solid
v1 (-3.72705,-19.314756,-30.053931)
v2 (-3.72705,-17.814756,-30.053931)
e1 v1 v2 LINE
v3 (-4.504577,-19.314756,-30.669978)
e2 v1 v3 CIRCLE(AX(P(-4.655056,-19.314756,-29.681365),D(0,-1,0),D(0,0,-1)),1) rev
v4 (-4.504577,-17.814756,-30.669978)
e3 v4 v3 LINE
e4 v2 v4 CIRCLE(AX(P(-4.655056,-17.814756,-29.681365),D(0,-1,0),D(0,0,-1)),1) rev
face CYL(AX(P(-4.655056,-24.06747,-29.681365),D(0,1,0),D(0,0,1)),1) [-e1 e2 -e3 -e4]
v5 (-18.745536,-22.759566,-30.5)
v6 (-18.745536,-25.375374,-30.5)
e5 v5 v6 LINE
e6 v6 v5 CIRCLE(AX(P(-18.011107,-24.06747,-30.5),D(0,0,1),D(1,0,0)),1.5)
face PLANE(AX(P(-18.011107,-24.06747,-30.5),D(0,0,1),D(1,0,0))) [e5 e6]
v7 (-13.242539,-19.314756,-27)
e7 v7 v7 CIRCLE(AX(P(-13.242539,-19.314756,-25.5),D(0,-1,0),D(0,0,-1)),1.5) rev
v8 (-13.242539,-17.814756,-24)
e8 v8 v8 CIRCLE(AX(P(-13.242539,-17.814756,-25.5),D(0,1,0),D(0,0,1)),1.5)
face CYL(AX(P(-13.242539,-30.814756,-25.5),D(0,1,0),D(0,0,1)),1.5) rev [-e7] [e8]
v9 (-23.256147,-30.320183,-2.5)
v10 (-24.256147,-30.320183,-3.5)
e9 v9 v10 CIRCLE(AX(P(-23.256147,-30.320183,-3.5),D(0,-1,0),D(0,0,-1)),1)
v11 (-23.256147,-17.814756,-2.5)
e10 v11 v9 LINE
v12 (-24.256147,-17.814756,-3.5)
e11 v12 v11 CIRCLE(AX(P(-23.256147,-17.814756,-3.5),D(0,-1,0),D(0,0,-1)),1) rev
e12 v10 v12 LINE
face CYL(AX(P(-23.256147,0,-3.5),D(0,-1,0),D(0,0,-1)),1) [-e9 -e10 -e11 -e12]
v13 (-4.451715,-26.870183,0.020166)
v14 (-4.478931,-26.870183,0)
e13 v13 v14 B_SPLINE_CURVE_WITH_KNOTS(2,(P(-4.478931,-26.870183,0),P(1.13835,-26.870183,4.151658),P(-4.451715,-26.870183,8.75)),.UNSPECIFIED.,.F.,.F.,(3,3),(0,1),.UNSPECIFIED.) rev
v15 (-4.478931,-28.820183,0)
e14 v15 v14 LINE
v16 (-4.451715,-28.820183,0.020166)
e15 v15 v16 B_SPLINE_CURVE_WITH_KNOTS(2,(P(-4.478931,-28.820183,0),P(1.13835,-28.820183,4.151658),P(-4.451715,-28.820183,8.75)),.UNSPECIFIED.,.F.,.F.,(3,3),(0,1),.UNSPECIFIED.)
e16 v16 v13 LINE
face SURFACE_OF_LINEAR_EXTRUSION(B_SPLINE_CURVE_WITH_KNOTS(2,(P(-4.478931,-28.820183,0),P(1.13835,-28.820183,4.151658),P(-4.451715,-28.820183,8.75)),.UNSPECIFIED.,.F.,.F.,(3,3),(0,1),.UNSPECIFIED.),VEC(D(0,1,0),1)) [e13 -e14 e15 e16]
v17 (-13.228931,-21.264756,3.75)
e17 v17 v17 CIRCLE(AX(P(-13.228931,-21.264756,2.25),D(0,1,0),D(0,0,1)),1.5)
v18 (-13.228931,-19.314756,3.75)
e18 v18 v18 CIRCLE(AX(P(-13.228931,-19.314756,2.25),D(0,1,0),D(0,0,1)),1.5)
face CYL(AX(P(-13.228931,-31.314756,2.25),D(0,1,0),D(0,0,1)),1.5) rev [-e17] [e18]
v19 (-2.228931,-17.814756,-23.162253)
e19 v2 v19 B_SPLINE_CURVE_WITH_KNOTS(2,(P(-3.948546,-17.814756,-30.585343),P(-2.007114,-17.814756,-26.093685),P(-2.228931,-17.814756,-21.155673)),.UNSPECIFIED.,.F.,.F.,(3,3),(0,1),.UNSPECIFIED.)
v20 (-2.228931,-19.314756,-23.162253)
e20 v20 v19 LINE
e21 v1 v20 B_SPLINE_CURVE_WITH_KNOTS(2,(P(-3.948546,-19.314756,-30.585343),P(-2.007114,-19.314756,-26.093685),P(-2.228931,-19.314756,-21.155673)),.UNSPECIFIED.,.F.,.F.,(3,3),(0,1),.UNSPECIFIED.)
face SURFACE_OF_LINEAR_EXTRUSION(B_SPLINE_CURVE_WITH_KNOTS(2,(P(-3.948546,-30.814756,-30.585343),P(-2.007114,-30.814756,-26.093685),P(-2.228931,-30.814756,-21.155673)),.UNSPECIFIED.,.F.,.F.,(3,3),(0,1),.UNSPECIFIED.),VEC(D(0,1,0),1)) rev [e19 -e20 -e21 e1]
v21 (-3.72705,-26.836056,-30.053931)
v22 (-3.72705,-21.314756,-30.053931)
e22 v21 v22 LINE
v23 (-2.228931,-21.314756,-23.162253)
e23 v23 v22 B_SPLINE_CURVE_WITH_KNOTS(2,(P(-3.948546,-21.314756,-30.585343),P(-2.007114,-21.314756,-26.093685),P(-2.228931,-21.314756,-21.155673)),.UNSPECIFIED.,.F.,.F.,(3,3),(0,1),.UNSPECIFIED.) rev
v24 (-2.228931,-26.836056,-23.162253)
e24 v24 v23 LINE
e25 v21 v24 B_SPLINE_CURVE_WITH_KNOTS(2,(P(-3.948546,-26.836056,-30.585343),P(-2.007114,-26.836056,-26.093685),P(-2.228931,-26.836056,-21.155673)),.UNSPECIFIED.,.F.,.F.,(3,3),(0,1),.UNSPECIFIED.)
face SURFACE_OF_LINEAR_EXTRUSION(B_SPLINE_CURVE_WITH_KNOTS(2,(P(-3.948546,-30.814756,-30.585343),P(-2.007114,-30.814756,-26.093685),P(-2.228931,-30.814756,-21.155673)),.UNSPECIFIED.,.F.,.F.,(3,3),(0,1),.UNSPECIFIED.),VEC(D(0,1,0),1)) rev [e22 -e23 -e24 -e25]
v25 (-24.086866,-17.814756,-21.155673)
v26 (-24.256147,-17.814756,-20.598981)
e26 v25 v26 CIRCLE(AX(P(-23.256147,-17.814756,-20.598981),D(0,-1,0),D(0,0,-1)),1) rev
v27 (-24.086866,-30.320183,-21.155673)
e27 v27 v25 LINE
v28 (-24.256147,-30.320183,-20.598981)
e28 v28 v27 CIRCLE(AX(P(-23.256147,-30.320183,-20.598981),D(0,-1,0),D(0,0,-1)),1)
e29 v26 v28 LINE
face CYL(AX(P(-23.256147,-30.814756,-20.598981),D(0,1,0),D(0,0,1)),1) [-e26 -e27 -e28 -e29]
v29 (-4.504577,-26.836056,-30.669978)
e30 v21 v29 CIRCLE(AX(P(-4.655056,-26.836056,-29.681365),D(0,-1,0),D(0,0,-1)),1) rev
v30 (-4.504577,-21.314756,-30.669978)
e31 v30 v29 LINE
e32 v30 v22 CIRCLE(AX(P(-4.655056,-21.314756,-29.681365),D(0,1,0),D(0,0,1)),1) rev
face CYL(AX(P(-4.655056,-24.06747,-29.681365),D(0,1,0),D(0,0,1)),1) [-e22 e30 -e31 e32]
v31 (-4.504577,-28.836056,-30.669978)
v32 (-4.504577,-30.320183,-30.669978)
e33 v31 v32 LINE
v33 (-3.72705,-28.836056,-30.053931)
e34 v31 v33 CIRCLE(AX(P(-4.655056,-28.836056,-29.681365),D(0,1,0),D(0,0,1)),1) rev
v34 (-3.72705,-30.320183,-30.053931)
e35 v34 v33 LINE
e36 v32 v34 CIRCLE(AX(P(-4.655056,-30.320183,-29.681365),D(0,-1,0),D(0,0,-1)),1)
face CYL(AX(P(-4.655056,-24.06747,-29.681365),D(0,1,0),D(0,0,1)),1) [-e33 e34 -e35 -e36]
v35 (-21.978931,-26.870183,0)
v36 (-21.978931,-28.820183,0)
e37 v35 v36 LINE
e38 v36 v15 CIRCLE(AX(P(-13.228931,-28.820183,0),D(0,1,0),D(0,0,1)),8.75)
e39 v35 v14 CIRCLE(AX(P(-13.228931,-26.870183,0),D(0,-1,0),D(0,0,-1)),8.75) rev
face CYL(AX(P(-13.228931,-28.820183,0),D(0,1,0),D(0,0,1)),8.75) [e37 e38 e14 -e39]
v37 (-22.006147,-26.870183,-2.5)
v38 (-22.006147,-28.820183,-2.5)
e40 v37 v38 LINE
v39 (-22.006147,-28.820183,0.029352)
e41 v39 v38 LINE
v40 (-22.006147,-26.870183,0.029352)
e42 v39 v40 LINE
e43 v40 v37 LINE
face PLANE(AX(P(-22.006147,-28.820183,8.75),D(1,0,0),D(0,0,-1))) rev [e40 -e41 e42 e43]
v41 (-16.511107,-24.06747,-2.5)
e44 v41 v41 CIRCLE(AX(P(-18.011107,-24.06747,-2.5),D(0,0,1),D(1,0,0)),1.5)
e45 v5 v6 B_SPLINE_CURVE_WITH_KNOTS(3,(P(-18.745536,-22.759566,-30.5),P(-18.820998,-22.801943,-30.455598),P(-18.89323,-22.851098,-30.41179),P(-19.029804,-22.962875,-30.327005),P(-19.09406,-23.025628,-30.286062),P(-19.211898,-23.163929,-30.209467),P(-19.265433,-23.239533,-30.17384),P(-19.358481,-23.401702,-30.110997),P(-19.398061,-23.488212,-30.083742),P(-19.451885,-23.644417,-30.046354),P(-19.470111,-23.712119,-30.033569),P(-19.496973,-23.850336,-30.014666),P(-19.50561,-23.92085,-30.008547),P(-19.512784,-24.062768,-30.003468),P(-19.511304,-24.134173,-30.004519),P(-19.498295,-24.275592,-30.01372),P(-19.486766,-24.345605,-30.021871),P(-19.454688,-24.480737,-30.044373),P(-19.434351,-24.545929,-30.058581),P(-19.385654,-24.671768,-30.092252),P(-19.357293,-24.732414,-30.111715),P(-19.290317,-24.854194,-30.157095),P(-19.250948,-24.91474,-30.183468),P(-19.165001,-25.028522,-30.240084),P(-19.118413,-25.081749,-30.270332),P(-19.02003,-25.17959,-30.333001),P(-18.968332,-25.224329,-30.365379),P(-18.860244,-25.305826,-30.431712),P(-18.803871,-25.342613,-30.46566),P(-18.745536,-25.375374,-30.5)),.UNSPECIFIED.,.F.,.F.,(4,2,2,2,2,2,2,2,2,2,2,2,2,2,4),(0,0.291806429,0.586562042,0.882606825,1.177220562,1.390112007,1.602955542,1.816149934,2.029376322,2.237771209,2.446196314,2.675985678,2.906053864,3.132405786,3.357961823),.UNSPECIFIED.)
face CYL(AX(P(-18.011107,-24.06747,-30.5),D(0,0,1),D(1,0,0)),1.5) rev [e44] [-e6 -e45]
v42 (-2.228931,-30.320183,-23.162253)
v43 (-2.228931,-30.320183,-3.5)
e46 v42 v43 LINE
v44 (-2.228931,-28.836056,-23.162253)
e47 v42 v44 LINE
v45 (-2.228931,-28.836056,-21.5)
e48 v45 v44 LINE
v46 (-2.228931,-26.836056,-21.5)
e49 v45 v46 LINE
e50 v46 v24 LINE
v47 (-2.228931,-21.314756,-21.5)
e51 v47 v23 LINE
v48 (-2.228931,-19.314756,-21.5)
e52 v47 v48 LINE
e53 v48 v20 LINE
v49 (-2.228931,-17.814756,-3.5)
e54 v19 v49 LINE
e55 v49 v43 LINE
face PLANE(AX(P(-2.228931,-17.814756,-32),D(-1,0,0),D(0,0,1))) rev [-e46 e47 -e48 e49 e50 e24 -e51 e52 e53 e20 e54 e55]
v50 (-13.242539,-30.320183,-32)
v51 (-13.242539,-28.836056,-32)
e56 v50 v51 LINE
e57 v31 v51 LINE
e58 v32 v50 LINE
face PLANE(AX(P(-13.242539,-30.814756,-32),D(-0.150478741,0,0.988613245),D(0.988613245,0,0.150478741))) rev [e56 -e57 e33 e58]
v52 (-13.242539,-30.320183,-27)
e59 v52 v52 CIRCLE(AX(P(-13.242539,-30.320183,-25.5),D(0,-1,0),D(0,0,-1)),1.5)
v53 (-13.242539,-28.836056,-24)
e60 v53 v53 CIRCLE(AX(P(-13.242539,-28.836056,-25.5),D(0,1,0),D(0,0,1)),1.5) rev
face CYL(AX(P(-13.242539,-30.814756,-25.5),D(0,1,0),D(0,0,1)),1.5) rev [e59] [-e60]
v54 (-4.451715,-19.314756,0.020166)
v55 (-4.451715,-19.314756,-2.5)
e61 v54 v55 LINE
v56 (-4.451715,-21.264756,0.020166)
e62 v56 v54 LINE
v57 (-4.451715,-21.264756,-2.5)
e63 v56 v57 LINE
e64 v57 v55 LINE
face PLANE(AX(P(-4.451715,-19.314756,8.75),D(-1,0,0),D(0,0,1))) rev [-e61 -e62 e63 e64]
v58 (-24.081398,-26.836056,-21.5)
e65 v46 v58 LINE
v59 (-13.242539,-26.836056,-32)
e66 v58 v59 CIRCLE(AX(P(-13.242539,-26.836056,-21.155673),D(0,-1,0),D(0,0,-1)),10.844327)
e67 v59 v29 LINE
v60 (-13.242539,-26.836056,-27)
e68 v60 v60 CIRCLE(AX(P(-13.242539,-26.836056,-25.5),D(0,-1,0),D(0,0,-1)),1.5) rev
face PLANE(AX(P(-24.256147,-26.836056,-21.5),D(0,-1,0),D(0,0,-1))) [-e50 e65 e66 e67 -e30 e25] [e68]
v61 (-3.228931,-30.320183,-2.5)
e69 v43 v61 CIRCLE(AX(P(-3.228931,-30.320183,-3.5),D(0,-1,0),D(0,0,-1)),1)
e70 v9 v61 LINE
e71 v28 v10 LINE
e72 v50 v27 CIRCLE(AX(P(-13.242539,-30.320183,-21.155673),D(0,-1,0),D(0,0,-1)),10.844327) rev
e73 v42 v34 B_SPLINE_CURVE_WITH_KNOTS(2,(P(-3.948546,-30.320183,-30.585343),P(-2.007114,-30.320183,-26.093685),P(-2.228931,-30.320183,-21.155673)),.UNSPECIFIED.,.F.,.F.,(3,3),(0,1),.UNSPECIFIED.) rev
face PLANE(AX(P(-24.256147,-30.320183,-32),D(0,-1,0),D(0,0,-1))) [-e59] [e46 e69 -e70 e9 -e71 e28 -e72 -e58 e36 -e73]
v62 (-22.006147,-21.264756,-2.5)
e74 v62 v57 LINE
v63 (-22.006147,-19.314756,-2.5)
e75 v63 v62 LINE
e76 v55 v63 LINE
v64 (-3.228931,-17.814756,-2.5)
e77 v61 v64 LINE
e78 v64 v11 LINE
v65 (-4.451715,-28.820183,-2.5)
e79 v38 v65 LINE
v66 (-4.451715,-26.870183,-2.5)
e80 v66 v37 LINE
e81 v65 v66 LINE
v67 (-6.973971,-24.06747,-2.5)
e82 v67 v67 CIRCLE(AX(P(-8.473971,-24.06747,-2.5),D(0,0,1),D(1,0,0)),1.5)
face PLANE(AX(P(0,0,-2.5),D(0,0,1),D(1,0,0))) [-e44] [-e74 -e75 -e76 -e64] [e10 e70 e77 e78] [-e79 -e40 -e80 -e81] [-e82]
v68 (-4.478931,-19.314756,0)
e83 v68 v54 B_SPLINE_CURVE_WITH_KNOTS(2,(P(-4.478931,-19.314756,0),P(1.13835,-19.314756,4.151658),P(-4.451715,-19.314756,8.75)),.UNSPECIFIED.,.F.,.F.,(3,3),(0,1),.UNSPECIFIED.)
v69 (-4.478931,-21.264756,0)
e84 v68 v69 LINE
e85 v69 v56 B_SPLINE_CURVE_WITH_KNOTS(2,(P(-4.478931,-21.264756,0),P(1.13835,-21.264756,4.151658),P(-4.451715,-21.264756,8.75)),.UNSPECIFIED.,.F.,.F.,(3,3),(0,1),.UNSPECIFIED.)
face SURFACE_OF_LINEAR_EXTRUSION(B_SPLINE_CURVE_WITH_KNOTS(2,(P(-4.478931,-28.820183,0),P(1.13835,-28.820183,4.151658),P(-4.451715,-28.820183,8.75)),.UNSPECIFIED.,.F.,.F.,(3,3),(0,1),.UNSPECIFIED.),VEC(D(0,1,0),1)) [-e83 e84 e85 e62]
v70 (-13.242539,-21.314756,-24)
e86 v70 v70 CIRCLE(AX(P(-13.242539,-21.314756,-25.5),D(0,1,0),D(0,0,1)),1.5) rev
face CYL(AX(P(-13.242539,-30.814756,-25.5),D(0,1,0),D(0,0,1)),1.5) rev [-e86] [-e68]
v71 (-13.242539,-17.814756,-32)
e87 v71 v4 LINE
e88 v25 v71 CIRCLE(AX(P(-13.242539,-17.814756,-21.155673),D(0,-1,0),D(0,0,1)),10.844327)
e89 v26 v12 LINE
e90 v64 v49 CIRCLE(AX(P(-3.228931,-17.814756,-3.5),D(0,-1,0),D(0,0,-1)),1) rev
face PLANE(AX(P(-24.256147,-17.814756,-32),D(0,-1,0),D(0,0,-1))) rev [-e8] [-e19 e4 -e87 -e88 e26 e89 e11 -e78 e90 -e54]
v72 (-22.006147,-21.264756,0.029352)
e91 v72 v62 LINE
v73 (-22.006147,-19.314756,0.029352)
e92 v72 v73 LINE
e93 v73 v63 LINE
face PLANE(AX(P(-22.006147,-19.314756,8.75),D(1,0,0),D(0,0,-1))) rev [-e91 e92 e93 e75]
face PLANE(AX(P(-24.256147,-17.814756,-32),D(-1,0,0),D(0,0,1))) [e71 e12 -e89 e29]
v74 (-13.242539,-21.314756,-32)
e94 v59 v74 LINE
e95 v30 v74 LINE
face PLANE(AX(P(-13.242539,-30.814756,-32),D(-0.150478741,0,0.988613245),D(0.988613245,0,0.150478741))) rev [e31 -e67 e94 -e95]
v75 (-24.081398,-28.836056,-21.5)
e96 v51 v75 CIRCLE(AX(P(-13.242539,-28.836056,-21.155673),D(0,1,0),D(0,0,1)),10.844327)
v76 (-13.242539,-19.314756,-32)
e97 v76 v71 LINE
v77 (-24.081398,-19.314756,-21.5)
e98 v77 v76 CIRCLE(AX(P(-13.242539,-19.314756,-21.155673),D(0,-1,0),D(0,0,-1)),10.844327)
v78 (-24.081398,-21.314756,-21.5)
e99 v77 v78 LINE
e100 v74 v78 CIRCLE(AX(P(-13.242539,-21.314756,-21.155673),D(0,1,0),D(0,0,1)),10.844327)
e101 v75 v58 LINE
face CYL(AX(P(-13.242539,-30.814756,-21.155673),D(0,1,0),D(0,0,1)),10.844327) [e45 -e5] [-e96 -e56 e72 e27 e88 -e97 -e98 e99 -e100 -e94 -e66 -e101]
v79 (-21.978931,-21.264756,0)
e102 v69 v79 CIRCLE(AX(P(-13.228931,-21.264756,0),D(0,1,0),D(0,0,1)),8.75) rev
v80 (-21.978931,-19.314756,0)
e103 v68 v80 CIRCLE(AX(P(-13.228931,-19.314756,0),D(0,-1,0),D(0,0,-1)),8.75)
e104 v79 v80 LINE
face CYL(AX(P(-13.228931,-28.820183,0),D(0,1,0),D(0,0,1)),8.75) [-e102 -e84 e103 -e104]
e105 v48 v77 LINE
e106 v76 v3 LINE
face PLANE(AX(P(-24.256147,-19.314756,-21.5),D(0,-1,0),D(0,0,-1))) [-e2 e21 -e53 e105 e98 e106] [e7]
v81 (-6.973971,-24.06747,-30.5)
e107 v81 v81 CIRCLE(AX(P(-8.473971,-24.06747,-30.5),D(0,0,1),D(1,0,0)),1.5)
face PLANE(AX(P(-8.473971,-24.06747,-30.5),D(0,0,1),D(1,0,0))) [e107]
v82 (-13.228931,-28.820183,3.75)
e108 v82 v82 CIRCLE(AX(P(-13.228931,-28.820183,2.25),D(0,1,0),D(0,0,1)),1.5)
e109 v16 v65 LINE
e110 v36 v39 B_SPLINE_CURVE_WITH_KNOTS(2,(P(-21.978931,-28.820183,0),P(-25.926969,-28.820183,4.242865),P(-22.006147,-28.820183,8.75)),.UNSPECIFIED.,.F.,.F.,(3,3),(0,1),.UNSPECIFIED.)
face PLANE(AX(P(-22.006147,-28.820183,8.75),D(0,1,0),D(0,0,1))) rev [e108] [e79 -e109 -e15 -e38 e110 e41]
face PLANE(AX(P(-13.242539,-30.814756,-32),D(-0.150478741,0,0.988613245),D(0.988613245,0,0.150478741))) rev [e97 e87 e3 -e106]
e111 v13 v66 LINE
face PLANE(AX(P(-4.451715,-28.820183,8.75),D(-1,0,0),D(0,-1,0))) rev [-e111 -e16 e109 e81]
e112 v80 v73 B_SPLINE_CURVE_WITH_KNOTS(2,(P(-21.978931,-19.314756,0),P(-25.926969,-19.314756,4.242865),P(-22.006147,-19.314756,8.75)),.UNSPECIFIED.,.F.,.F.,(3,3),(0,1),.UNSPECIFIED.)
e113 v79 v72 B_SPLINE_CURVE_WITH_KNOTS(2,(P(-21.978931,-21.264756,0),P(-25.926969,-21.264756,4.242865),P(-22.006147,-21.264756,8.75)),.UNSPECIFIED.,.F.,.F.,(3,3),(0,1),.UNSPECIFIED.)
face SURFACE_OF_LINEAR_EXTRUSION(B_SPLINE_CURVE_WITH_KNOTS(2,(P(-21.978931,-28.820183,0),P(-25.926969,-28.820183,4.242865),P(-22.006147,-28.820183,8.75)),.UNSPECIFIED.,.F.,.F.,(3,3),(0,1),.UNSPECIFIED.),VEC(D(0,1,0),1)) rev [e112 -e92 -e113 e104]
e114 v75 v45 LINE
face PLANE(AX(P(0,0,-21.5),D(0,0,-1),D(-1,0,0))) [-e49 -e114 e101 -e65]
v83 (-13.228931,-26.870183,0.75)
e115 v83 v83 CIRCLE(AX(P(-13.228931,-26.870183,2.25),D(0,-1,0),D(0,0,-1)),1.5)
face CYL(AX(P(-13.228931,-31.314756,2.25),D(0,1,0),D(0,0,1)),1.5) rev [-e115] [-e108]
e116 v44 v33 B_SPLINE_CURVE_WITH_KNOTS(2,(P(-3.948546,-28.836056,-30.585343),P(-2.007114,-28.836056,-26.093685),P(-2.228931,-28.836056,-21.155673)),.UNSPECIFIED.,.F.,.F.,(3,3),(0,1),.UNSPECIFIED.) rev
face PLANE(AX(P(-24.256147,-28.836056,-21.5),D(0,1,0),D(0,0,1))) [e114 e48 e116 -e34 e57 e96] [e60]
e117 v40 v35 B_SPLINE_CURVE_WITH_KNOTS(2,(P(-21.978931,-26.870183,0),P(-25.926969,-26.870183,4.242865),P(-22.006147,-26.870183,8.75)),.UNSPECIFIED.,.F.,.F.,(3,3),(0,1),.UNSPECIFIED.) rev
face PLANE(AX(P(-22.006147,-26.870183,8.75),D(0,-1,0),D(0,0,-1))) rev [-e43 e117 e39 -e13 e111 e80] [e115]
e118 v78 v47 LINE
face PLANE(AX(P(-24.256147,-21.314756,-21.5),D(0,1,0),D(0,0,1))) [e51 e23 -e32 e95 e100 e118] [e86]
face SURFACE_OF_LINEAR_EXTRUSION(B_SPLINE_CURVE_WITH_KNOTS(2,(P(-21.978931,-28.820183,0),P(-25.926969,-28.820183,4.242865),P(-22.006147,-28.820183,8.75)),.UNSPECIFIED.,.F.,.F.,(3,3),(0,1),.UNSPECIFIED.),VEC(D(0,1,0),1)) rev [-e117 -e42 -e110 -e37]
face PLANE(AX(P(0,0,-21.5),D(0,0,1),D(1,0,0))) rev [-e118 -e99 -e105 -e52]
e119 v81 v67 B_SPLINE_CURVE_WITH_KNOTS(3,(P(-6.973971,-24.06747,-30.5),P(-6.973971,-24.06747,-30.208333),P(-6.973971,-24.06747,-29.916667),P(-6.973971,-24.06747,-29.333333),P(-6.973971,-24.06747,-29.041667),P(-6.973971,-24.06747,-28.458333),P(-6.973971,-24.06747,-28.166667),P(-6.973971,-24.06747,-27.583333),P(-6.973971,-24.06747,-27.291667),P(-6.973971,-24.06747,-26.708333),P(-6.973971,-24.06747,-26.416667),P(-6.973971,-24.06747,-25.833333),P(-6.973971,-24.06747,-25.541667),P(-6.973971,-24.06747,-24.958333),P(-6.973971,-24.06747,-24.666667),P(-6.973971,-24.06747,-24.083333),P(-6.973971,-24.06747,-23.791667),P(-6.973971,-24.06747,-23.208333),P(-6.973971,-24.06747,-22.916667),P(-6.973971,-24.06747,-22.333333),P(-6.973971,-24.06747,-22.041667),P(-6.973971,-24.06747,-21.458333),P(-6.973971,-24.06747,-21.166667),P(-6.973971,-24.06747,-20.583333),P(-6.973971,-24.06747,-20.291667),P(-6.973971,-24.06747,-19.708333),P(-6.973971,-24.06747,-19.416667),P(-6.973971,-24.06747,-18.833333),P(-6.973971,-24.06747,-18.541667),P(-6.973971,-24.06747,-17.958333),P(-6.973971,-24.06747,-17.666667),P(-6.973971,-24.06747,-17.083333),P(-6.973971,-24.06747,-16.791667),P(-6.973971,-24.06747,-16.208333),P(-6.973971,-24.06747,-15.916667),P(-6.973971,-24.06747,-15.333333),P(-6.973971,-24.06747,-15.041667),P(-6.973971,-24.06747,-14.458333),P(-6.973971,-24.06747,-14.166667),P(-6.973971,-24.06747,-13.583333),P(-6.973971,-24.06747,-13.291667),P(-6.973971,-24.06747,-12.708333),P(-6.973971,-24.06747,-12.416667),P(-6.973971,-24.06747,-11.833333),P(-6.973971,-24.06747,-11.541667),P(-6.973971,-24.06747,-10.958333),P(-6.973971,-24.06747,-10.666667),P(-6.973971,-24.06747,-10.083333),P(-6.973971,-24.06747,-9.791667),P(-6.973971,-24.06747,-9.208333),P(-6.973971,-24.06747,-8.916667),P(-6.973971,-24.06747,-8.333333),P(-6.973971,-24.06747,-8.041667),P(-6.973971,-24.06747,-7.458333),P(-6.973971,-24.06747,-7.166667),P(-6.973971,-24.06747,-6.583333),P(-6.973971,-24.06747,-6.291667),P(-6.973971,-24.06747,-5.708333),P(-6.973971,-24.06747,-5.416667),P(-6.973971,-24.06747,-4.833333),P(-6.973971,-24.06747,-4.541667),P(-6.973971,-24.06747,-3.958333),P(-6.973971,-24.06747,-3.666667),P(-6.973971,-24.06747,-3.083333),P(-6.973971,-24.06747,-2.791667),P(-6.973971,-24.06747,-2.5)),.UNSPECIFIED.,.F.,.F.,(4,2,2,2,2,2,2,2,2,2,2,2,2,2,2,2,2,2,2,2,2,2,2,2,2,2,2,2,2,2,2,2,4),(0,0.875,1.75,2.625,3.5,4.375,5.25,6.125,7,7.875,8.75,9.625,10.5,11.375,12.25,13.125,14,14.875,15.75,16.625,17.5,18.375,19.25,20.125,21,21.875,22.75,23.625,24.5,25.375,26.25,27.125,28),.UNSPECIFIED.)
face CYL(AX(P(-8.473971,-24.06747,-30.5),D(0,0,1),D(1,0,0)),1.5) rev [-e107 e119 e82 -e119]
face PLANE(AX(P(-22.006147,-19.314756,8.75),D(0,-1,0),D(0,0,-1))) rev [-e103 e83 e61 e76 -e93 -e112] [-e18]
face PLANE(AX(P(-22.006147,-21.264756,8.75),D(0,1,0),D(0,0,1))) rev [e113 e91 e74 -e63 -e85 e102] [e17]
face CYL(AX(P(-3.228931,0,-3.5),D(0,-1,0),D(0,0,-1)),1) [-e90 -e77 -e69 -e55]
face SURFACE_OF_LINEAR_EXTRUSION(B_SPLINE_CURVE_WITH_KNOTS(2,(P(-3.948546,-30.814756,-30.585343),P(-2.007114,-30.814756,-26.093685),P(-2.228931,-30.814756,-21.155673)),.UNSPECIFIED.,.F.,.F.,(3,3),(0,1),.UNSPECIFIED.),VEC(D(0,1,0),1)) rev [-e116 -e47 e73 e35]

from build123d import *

# Parameters (mm, degrees)
SKETCH2_W             = 17.554431489
SKETCH2_H             = 1.95
BOSS_EXTRUDE1_DEPTH   = 8.75
BOSS_EXTRUDE1_2_DEPTH = 8.75
CUT_EXTRUDE1_DEPTH    = 26.518349076
SKETCH4_W             = 22.027215745
SKETCH4_H             = 12.505427167
BOSS_EXTRUDE2_DEPTH   = 32
SKETCH5_R             = 1.5
CUT_EXTRUDE2_DEPTH    = 12
SKETCH6_W             = 22.027215745
SKETCH6_H             = 12.505427167
SKETCH6_W_2           = 17.554431489
SKETCH6_H_2           = 1.95
CUT_EXTRUDE3_DEPTH    = 2.5
SKETCH7_R             = 1.5
CUT_EXTRUDE4_DEPTH    = 13
SKETCH8_R             = 1.5
CUT_EXTRUDE5_DEPTH    = 28
FILLET3_R             = 1
SKETCH9_W             = 22.02721574
SKETCH9_H             = 2
CUT_EXTRUDE6_DEPTH    = 11


with BuildPart() as part:
    # Sketch2 → Boss-Extrude1 (new body)
    with BuildSketch(Plane.XY):
        with Locations((-13.228930986, -27.845183414)):
            Rectangle(SKETCH2_W, SKETCH2_H)
    extrude(amount=BOSS_EXTRUDE1_DEPTH)


with BuildPart() as body_2:
    # Sketch2 → Boss-Extrude1 2 (new body)
    with BuildSketch(Plane.XY):
        with Locations((-13.228930986, -20.289756247)):
            Rectangle(SKETCH2_W, SKETCH2_H)
    extrude(amount=BOSS_EXTRUDE1_2_DEPTH)


with BuildPart() as cut_extrude1_tool:
    # Sketch3 → Cut-Extrude1 (new, through all)
    with BuildSketch(Plane(origin=(0, -19.314756247, 0), x_dir=(1, 0, 0), z_dir=(0, 1, 0))):
        with BuildLine():
            ThreePointArc((-13.228930986, -8.75), (-7.041746651, -6.187184335), (-4.478930986, 0))
            add(Edge.make_bspline(
                [(-4.478930986, 0), (1.138349918, -4.151657709), (-4.451715242, -8.75)],
                knots=[0, 0, 0, 1, 1, 1], degree=2))
            add(Edge.make_bspline(
                [(-22.006146731, -8.75), (-13.228930986, -12.473510392), (-4.451715242, -8.75)],
                knots=[0, 0, 0, 1, 1, 1], degree=2))
            add(Edge.make_bspline(
                [(-21.978930986, 0), (-25.926969228, -4.242865138), (-22.006146731, -8.75)],
                knots=[0, 0, 0, 1, 1, 1], degree=2))
            ThreePointArc((-21.978930986, 0), (-19.416115322, -6.187184335), (-13.228930986, -8.75))
        make_face()
    extrude(amount=-CUT_EXTRUDE1_DEPTH)


with BuildPart() as part_1:
    add(part.part)

    # Cut-Extrude1: cut by cut_extrude1_tool
    add(cut_extrude1_tool.part, mode=Mode.SUBTRACT)



with BuildPart() as body_2_1:
    add(body_2.part)

    # Cut-Extrude1: cut by cut_extrude1_tool
    add(cut_extrude1_tool.part, mode=Mode.SUBTRACT)


with BuildPart() as part_2:
    add(part_1.part)

    add(body_2_1.part)  # Boss-Extrude2 merges body 2
    # Sketch4 → Boss-Extrude2 (add)
    with BuildSketch(Plane(origin=(0, 0, 0), x_dir=(-1, 0, 0), z_dir=(0, 0, -1))):
        with Locations((13.242538859, -24.067469831)):
            Rectangle(SKETCH4_W, SKETCH4_H)
    extrude(amount=BOSS_EXTRUDE2_DEPTH)

    # Sketch5 → Cut-Extrude2 (cut)
    with BuildSketch(Plane(origin=(0, -19.314756247, 0), x_dir=(1, 0, 0), z_dir=(0, 1, 0))):
        with Locations(Location((-13.228930986, -2.25, 0), (0, 0, 270))):
            Circle(SKETCH5_R)
    extrude(amount=-CUT_EXTRUDE2_DEPTH, mode=Mode.SUBTRACT)

    # Sketch6 → Cut-Extrude3 (cut)
    with BuildSketch(Plane.XY):
        with Locations((-13.242538859, -24.067469831)):
            Rectangle(SKETCH6_W, SKETCH6_H)
        with Locations((-13.228930986, -27.845183414)):
            Rectangle(SKETCH6_W_2, SKETCH6_H_2, mode=Mode.SUBTRACT)
        with Locations((-13.228930986, -20.289756247)):
            Rectangle(SKETCH6_W_2, SKETCH6_H_2, mode=Mode.SUBTRACT)
    extrude(amount=-CUT_EXTRUDE3_DEPTH, mode=Mode.SUBTRACT)

    # Sketch7 → Cut-Extrude4 (cut)
    with BuildSketch(Plane(origin=(0, -17.814756247, 0), x_dir=(1, 0, 0), z_dir=(0, 1, 0))):
        with Locations(Location((-13.242538859, 25.5, 0), (0, 0, 270))):
            Circle(SKETCH7_R)
        with BuildLine():
            Line((-24.086865874, 21.155672985), (-24.256146731, 21.155672985))
            add(Edge.make_bspline(
                [(-2.228930986, 21.155672985), (11.471530889, 27.189710441), (-11.765166974, 53.431279988), (-37.007876173, 21.523583672), (-24.256146731, 21.155672985)],
                knots=[0, 0, 0, 0, 0.52011282, 1, 1, 1, 1], degree=3))
            add(Edge.make_bspline(
                [(-3.948545621, 30.585343246), (-2.007113924, 26.093685314), (-2.228930986, 21.155672985)],
                knots=[0, 0, 0, 1, 1, 1], degree=2))
            Line((-3.948545621, 30.585343246), (-13.242538859, 32))
            ThreePointArc((-13.242538859, 32), (-20.910636028, 28.823770155), (-24.086865874, 21.155672985))
        make_face()
    extrude(amount=-CUT_EXTRUDE4_DEPTH, mode=Mode.SUBTRACT)

    # Sketch8 → Cut-Extrude5 (cut)
    with BuildSketch(Plane.XY.offset(-2.5)):
        with Locations((-18.011106811, -24.06746983)):
            Circle(SKETCH8_R)
        with Locations((-8.473970906, -24.06746983)):
            Circle(SKETCH8_R)
    extrude(amount=-CUT_EXTRUDE5_DEPTH, mode=Mode.SUBTRACT)

    # Fillet3
    # the kernel refuses this fillet: 1 mm, written as the material it takes off along each edge
    with BuildSketch(Plane(origin=(-24.256146731, -15.314756247, -2.5), x_dir=(1, 0, 0), z_dir=(0, -1, 0))) as fillet3_piece_1:
        with BuildLine():
            CenterArc((FILLET3_R, -FILLET3_R), FILLET3_R, 90, 90)
            Line((0, -FILLET3_R), (-FILLET3_R * 0.02, -FILLET3_R))
            Line((-FILLET3_R * 0.02, -FILLET3_R), (-FILLET3_R * 0.02, FILLET3_R * 0.02))
            Line((-FILLET3_R * 0.02, FILLET3_R * 0.02), (FILLET3_R, FILLET3_R * 0.02))
            Line((FILLET3_R, FILLET3_R * 0.02), (FILLET3_R, 0))
        make_face()
    extrude(amount=17.505427167, mode=Mode.SUBTRACT)
    with BuildSketch(Plane(origin=(-24.256146731, -16.423026869, -21.155672985), x_dir=(0, 0, 1), z_dir=(0, -1, 0))) as fillet3_piece_2:
        with BuildLine():
            CenterArc((0.556691751, -1), FILLET3_R, 90, 33.827317624)
            Line((0, -0.169280857), (-0.011133835, -0.152666474))
            ThreePointArc((-0.011133835, -0.152666474), (-0.02, -0.084640429), (-0.02, 0))
            Line((-0.02, 0), (0, 0.02))
            Line((0, 0.02), (0.556691751, 0.02))
            Line((0.556691751, 0.02), (0.556691751, 0))
        make_face()
    extrude(amount=15.288885922, mode=Mode.SUBTRACT)
    with BuildSketch(Plane(origin=(-2.228930986, -32.820183414, -2.5), x_dir=(0, 0, -1), z_dir=(0, 1, 0))) as fillet3_piece_3:
        with BuildLine():
            CenterArc((FILLET3_R, FILLET3_R), FILLET3_R, 180, 90)
            Line((0, FILLET3_R), (-FILLET3_R * 0.02, FILLET3_R))
            Line((-FILLET3_R * 0.02, FILLET3_R), (-FILLET3_R * 0.02, -FILLET3_R * 0.02))
            Line((-FILLET3_R * 0.02, -FILLET3_R * 0.02), (FILLET3_R, -FILLET3_R * 0.02))
            Line((FILLET3_R, -FILLET3_R * 0.02), (FILLET3_R, 0))
        make_face()
    extrude(amount=17.505427167, mode=Mode.SUBTRACT)
    with BuildSketch(Plane(origin=(-3.948545621, -16.375444783, -30.585343246), x_dir=(-0.9886132451058307, 0, -0.1504787413600958), z_dir=(0, -1, 0))) as fillet3_piece_4:
        with BuildLine():
            CenterArc((0.562435527, -1), FILLET3_R, 90, 59.471323616)
            Line((-0.298939504, -0.492030458), (-0.316167005, -0.481871067))
            ThreePointArc((-0.316167005, -0.481871067), (-0.168173949, -0.234650824), (-0.016955383, 0.010607308))
            Line((-0.016955383, 0.010607308), (0, 0.02))
            Line((0, 0.02), (0.562435527, 0.02))
            Line((0.562435527, 0.02), (0.562435527, 0))
        make_face()
    extrude(amount=15.384050094, mode=Mode.SUBTRACT)

    # Sketch9 → Cut-Extrude6 (cut)
    with BuildSketch(Plane.XY.offset(-32.5)):
        with Locations((-13.24253886, -20.31475625)):
            Rectangle(SKETCH9_W, SKETCH9_H)
        with Locations((-13.24253886, -27.836055834)):
            Rectangle(SKETCH9_W, SKETCH9_H)
    extrude(amount=CUT_EXTRUDE6_DEPTH, mode=Mode.SUBTRACT)


solid = part_2.part
